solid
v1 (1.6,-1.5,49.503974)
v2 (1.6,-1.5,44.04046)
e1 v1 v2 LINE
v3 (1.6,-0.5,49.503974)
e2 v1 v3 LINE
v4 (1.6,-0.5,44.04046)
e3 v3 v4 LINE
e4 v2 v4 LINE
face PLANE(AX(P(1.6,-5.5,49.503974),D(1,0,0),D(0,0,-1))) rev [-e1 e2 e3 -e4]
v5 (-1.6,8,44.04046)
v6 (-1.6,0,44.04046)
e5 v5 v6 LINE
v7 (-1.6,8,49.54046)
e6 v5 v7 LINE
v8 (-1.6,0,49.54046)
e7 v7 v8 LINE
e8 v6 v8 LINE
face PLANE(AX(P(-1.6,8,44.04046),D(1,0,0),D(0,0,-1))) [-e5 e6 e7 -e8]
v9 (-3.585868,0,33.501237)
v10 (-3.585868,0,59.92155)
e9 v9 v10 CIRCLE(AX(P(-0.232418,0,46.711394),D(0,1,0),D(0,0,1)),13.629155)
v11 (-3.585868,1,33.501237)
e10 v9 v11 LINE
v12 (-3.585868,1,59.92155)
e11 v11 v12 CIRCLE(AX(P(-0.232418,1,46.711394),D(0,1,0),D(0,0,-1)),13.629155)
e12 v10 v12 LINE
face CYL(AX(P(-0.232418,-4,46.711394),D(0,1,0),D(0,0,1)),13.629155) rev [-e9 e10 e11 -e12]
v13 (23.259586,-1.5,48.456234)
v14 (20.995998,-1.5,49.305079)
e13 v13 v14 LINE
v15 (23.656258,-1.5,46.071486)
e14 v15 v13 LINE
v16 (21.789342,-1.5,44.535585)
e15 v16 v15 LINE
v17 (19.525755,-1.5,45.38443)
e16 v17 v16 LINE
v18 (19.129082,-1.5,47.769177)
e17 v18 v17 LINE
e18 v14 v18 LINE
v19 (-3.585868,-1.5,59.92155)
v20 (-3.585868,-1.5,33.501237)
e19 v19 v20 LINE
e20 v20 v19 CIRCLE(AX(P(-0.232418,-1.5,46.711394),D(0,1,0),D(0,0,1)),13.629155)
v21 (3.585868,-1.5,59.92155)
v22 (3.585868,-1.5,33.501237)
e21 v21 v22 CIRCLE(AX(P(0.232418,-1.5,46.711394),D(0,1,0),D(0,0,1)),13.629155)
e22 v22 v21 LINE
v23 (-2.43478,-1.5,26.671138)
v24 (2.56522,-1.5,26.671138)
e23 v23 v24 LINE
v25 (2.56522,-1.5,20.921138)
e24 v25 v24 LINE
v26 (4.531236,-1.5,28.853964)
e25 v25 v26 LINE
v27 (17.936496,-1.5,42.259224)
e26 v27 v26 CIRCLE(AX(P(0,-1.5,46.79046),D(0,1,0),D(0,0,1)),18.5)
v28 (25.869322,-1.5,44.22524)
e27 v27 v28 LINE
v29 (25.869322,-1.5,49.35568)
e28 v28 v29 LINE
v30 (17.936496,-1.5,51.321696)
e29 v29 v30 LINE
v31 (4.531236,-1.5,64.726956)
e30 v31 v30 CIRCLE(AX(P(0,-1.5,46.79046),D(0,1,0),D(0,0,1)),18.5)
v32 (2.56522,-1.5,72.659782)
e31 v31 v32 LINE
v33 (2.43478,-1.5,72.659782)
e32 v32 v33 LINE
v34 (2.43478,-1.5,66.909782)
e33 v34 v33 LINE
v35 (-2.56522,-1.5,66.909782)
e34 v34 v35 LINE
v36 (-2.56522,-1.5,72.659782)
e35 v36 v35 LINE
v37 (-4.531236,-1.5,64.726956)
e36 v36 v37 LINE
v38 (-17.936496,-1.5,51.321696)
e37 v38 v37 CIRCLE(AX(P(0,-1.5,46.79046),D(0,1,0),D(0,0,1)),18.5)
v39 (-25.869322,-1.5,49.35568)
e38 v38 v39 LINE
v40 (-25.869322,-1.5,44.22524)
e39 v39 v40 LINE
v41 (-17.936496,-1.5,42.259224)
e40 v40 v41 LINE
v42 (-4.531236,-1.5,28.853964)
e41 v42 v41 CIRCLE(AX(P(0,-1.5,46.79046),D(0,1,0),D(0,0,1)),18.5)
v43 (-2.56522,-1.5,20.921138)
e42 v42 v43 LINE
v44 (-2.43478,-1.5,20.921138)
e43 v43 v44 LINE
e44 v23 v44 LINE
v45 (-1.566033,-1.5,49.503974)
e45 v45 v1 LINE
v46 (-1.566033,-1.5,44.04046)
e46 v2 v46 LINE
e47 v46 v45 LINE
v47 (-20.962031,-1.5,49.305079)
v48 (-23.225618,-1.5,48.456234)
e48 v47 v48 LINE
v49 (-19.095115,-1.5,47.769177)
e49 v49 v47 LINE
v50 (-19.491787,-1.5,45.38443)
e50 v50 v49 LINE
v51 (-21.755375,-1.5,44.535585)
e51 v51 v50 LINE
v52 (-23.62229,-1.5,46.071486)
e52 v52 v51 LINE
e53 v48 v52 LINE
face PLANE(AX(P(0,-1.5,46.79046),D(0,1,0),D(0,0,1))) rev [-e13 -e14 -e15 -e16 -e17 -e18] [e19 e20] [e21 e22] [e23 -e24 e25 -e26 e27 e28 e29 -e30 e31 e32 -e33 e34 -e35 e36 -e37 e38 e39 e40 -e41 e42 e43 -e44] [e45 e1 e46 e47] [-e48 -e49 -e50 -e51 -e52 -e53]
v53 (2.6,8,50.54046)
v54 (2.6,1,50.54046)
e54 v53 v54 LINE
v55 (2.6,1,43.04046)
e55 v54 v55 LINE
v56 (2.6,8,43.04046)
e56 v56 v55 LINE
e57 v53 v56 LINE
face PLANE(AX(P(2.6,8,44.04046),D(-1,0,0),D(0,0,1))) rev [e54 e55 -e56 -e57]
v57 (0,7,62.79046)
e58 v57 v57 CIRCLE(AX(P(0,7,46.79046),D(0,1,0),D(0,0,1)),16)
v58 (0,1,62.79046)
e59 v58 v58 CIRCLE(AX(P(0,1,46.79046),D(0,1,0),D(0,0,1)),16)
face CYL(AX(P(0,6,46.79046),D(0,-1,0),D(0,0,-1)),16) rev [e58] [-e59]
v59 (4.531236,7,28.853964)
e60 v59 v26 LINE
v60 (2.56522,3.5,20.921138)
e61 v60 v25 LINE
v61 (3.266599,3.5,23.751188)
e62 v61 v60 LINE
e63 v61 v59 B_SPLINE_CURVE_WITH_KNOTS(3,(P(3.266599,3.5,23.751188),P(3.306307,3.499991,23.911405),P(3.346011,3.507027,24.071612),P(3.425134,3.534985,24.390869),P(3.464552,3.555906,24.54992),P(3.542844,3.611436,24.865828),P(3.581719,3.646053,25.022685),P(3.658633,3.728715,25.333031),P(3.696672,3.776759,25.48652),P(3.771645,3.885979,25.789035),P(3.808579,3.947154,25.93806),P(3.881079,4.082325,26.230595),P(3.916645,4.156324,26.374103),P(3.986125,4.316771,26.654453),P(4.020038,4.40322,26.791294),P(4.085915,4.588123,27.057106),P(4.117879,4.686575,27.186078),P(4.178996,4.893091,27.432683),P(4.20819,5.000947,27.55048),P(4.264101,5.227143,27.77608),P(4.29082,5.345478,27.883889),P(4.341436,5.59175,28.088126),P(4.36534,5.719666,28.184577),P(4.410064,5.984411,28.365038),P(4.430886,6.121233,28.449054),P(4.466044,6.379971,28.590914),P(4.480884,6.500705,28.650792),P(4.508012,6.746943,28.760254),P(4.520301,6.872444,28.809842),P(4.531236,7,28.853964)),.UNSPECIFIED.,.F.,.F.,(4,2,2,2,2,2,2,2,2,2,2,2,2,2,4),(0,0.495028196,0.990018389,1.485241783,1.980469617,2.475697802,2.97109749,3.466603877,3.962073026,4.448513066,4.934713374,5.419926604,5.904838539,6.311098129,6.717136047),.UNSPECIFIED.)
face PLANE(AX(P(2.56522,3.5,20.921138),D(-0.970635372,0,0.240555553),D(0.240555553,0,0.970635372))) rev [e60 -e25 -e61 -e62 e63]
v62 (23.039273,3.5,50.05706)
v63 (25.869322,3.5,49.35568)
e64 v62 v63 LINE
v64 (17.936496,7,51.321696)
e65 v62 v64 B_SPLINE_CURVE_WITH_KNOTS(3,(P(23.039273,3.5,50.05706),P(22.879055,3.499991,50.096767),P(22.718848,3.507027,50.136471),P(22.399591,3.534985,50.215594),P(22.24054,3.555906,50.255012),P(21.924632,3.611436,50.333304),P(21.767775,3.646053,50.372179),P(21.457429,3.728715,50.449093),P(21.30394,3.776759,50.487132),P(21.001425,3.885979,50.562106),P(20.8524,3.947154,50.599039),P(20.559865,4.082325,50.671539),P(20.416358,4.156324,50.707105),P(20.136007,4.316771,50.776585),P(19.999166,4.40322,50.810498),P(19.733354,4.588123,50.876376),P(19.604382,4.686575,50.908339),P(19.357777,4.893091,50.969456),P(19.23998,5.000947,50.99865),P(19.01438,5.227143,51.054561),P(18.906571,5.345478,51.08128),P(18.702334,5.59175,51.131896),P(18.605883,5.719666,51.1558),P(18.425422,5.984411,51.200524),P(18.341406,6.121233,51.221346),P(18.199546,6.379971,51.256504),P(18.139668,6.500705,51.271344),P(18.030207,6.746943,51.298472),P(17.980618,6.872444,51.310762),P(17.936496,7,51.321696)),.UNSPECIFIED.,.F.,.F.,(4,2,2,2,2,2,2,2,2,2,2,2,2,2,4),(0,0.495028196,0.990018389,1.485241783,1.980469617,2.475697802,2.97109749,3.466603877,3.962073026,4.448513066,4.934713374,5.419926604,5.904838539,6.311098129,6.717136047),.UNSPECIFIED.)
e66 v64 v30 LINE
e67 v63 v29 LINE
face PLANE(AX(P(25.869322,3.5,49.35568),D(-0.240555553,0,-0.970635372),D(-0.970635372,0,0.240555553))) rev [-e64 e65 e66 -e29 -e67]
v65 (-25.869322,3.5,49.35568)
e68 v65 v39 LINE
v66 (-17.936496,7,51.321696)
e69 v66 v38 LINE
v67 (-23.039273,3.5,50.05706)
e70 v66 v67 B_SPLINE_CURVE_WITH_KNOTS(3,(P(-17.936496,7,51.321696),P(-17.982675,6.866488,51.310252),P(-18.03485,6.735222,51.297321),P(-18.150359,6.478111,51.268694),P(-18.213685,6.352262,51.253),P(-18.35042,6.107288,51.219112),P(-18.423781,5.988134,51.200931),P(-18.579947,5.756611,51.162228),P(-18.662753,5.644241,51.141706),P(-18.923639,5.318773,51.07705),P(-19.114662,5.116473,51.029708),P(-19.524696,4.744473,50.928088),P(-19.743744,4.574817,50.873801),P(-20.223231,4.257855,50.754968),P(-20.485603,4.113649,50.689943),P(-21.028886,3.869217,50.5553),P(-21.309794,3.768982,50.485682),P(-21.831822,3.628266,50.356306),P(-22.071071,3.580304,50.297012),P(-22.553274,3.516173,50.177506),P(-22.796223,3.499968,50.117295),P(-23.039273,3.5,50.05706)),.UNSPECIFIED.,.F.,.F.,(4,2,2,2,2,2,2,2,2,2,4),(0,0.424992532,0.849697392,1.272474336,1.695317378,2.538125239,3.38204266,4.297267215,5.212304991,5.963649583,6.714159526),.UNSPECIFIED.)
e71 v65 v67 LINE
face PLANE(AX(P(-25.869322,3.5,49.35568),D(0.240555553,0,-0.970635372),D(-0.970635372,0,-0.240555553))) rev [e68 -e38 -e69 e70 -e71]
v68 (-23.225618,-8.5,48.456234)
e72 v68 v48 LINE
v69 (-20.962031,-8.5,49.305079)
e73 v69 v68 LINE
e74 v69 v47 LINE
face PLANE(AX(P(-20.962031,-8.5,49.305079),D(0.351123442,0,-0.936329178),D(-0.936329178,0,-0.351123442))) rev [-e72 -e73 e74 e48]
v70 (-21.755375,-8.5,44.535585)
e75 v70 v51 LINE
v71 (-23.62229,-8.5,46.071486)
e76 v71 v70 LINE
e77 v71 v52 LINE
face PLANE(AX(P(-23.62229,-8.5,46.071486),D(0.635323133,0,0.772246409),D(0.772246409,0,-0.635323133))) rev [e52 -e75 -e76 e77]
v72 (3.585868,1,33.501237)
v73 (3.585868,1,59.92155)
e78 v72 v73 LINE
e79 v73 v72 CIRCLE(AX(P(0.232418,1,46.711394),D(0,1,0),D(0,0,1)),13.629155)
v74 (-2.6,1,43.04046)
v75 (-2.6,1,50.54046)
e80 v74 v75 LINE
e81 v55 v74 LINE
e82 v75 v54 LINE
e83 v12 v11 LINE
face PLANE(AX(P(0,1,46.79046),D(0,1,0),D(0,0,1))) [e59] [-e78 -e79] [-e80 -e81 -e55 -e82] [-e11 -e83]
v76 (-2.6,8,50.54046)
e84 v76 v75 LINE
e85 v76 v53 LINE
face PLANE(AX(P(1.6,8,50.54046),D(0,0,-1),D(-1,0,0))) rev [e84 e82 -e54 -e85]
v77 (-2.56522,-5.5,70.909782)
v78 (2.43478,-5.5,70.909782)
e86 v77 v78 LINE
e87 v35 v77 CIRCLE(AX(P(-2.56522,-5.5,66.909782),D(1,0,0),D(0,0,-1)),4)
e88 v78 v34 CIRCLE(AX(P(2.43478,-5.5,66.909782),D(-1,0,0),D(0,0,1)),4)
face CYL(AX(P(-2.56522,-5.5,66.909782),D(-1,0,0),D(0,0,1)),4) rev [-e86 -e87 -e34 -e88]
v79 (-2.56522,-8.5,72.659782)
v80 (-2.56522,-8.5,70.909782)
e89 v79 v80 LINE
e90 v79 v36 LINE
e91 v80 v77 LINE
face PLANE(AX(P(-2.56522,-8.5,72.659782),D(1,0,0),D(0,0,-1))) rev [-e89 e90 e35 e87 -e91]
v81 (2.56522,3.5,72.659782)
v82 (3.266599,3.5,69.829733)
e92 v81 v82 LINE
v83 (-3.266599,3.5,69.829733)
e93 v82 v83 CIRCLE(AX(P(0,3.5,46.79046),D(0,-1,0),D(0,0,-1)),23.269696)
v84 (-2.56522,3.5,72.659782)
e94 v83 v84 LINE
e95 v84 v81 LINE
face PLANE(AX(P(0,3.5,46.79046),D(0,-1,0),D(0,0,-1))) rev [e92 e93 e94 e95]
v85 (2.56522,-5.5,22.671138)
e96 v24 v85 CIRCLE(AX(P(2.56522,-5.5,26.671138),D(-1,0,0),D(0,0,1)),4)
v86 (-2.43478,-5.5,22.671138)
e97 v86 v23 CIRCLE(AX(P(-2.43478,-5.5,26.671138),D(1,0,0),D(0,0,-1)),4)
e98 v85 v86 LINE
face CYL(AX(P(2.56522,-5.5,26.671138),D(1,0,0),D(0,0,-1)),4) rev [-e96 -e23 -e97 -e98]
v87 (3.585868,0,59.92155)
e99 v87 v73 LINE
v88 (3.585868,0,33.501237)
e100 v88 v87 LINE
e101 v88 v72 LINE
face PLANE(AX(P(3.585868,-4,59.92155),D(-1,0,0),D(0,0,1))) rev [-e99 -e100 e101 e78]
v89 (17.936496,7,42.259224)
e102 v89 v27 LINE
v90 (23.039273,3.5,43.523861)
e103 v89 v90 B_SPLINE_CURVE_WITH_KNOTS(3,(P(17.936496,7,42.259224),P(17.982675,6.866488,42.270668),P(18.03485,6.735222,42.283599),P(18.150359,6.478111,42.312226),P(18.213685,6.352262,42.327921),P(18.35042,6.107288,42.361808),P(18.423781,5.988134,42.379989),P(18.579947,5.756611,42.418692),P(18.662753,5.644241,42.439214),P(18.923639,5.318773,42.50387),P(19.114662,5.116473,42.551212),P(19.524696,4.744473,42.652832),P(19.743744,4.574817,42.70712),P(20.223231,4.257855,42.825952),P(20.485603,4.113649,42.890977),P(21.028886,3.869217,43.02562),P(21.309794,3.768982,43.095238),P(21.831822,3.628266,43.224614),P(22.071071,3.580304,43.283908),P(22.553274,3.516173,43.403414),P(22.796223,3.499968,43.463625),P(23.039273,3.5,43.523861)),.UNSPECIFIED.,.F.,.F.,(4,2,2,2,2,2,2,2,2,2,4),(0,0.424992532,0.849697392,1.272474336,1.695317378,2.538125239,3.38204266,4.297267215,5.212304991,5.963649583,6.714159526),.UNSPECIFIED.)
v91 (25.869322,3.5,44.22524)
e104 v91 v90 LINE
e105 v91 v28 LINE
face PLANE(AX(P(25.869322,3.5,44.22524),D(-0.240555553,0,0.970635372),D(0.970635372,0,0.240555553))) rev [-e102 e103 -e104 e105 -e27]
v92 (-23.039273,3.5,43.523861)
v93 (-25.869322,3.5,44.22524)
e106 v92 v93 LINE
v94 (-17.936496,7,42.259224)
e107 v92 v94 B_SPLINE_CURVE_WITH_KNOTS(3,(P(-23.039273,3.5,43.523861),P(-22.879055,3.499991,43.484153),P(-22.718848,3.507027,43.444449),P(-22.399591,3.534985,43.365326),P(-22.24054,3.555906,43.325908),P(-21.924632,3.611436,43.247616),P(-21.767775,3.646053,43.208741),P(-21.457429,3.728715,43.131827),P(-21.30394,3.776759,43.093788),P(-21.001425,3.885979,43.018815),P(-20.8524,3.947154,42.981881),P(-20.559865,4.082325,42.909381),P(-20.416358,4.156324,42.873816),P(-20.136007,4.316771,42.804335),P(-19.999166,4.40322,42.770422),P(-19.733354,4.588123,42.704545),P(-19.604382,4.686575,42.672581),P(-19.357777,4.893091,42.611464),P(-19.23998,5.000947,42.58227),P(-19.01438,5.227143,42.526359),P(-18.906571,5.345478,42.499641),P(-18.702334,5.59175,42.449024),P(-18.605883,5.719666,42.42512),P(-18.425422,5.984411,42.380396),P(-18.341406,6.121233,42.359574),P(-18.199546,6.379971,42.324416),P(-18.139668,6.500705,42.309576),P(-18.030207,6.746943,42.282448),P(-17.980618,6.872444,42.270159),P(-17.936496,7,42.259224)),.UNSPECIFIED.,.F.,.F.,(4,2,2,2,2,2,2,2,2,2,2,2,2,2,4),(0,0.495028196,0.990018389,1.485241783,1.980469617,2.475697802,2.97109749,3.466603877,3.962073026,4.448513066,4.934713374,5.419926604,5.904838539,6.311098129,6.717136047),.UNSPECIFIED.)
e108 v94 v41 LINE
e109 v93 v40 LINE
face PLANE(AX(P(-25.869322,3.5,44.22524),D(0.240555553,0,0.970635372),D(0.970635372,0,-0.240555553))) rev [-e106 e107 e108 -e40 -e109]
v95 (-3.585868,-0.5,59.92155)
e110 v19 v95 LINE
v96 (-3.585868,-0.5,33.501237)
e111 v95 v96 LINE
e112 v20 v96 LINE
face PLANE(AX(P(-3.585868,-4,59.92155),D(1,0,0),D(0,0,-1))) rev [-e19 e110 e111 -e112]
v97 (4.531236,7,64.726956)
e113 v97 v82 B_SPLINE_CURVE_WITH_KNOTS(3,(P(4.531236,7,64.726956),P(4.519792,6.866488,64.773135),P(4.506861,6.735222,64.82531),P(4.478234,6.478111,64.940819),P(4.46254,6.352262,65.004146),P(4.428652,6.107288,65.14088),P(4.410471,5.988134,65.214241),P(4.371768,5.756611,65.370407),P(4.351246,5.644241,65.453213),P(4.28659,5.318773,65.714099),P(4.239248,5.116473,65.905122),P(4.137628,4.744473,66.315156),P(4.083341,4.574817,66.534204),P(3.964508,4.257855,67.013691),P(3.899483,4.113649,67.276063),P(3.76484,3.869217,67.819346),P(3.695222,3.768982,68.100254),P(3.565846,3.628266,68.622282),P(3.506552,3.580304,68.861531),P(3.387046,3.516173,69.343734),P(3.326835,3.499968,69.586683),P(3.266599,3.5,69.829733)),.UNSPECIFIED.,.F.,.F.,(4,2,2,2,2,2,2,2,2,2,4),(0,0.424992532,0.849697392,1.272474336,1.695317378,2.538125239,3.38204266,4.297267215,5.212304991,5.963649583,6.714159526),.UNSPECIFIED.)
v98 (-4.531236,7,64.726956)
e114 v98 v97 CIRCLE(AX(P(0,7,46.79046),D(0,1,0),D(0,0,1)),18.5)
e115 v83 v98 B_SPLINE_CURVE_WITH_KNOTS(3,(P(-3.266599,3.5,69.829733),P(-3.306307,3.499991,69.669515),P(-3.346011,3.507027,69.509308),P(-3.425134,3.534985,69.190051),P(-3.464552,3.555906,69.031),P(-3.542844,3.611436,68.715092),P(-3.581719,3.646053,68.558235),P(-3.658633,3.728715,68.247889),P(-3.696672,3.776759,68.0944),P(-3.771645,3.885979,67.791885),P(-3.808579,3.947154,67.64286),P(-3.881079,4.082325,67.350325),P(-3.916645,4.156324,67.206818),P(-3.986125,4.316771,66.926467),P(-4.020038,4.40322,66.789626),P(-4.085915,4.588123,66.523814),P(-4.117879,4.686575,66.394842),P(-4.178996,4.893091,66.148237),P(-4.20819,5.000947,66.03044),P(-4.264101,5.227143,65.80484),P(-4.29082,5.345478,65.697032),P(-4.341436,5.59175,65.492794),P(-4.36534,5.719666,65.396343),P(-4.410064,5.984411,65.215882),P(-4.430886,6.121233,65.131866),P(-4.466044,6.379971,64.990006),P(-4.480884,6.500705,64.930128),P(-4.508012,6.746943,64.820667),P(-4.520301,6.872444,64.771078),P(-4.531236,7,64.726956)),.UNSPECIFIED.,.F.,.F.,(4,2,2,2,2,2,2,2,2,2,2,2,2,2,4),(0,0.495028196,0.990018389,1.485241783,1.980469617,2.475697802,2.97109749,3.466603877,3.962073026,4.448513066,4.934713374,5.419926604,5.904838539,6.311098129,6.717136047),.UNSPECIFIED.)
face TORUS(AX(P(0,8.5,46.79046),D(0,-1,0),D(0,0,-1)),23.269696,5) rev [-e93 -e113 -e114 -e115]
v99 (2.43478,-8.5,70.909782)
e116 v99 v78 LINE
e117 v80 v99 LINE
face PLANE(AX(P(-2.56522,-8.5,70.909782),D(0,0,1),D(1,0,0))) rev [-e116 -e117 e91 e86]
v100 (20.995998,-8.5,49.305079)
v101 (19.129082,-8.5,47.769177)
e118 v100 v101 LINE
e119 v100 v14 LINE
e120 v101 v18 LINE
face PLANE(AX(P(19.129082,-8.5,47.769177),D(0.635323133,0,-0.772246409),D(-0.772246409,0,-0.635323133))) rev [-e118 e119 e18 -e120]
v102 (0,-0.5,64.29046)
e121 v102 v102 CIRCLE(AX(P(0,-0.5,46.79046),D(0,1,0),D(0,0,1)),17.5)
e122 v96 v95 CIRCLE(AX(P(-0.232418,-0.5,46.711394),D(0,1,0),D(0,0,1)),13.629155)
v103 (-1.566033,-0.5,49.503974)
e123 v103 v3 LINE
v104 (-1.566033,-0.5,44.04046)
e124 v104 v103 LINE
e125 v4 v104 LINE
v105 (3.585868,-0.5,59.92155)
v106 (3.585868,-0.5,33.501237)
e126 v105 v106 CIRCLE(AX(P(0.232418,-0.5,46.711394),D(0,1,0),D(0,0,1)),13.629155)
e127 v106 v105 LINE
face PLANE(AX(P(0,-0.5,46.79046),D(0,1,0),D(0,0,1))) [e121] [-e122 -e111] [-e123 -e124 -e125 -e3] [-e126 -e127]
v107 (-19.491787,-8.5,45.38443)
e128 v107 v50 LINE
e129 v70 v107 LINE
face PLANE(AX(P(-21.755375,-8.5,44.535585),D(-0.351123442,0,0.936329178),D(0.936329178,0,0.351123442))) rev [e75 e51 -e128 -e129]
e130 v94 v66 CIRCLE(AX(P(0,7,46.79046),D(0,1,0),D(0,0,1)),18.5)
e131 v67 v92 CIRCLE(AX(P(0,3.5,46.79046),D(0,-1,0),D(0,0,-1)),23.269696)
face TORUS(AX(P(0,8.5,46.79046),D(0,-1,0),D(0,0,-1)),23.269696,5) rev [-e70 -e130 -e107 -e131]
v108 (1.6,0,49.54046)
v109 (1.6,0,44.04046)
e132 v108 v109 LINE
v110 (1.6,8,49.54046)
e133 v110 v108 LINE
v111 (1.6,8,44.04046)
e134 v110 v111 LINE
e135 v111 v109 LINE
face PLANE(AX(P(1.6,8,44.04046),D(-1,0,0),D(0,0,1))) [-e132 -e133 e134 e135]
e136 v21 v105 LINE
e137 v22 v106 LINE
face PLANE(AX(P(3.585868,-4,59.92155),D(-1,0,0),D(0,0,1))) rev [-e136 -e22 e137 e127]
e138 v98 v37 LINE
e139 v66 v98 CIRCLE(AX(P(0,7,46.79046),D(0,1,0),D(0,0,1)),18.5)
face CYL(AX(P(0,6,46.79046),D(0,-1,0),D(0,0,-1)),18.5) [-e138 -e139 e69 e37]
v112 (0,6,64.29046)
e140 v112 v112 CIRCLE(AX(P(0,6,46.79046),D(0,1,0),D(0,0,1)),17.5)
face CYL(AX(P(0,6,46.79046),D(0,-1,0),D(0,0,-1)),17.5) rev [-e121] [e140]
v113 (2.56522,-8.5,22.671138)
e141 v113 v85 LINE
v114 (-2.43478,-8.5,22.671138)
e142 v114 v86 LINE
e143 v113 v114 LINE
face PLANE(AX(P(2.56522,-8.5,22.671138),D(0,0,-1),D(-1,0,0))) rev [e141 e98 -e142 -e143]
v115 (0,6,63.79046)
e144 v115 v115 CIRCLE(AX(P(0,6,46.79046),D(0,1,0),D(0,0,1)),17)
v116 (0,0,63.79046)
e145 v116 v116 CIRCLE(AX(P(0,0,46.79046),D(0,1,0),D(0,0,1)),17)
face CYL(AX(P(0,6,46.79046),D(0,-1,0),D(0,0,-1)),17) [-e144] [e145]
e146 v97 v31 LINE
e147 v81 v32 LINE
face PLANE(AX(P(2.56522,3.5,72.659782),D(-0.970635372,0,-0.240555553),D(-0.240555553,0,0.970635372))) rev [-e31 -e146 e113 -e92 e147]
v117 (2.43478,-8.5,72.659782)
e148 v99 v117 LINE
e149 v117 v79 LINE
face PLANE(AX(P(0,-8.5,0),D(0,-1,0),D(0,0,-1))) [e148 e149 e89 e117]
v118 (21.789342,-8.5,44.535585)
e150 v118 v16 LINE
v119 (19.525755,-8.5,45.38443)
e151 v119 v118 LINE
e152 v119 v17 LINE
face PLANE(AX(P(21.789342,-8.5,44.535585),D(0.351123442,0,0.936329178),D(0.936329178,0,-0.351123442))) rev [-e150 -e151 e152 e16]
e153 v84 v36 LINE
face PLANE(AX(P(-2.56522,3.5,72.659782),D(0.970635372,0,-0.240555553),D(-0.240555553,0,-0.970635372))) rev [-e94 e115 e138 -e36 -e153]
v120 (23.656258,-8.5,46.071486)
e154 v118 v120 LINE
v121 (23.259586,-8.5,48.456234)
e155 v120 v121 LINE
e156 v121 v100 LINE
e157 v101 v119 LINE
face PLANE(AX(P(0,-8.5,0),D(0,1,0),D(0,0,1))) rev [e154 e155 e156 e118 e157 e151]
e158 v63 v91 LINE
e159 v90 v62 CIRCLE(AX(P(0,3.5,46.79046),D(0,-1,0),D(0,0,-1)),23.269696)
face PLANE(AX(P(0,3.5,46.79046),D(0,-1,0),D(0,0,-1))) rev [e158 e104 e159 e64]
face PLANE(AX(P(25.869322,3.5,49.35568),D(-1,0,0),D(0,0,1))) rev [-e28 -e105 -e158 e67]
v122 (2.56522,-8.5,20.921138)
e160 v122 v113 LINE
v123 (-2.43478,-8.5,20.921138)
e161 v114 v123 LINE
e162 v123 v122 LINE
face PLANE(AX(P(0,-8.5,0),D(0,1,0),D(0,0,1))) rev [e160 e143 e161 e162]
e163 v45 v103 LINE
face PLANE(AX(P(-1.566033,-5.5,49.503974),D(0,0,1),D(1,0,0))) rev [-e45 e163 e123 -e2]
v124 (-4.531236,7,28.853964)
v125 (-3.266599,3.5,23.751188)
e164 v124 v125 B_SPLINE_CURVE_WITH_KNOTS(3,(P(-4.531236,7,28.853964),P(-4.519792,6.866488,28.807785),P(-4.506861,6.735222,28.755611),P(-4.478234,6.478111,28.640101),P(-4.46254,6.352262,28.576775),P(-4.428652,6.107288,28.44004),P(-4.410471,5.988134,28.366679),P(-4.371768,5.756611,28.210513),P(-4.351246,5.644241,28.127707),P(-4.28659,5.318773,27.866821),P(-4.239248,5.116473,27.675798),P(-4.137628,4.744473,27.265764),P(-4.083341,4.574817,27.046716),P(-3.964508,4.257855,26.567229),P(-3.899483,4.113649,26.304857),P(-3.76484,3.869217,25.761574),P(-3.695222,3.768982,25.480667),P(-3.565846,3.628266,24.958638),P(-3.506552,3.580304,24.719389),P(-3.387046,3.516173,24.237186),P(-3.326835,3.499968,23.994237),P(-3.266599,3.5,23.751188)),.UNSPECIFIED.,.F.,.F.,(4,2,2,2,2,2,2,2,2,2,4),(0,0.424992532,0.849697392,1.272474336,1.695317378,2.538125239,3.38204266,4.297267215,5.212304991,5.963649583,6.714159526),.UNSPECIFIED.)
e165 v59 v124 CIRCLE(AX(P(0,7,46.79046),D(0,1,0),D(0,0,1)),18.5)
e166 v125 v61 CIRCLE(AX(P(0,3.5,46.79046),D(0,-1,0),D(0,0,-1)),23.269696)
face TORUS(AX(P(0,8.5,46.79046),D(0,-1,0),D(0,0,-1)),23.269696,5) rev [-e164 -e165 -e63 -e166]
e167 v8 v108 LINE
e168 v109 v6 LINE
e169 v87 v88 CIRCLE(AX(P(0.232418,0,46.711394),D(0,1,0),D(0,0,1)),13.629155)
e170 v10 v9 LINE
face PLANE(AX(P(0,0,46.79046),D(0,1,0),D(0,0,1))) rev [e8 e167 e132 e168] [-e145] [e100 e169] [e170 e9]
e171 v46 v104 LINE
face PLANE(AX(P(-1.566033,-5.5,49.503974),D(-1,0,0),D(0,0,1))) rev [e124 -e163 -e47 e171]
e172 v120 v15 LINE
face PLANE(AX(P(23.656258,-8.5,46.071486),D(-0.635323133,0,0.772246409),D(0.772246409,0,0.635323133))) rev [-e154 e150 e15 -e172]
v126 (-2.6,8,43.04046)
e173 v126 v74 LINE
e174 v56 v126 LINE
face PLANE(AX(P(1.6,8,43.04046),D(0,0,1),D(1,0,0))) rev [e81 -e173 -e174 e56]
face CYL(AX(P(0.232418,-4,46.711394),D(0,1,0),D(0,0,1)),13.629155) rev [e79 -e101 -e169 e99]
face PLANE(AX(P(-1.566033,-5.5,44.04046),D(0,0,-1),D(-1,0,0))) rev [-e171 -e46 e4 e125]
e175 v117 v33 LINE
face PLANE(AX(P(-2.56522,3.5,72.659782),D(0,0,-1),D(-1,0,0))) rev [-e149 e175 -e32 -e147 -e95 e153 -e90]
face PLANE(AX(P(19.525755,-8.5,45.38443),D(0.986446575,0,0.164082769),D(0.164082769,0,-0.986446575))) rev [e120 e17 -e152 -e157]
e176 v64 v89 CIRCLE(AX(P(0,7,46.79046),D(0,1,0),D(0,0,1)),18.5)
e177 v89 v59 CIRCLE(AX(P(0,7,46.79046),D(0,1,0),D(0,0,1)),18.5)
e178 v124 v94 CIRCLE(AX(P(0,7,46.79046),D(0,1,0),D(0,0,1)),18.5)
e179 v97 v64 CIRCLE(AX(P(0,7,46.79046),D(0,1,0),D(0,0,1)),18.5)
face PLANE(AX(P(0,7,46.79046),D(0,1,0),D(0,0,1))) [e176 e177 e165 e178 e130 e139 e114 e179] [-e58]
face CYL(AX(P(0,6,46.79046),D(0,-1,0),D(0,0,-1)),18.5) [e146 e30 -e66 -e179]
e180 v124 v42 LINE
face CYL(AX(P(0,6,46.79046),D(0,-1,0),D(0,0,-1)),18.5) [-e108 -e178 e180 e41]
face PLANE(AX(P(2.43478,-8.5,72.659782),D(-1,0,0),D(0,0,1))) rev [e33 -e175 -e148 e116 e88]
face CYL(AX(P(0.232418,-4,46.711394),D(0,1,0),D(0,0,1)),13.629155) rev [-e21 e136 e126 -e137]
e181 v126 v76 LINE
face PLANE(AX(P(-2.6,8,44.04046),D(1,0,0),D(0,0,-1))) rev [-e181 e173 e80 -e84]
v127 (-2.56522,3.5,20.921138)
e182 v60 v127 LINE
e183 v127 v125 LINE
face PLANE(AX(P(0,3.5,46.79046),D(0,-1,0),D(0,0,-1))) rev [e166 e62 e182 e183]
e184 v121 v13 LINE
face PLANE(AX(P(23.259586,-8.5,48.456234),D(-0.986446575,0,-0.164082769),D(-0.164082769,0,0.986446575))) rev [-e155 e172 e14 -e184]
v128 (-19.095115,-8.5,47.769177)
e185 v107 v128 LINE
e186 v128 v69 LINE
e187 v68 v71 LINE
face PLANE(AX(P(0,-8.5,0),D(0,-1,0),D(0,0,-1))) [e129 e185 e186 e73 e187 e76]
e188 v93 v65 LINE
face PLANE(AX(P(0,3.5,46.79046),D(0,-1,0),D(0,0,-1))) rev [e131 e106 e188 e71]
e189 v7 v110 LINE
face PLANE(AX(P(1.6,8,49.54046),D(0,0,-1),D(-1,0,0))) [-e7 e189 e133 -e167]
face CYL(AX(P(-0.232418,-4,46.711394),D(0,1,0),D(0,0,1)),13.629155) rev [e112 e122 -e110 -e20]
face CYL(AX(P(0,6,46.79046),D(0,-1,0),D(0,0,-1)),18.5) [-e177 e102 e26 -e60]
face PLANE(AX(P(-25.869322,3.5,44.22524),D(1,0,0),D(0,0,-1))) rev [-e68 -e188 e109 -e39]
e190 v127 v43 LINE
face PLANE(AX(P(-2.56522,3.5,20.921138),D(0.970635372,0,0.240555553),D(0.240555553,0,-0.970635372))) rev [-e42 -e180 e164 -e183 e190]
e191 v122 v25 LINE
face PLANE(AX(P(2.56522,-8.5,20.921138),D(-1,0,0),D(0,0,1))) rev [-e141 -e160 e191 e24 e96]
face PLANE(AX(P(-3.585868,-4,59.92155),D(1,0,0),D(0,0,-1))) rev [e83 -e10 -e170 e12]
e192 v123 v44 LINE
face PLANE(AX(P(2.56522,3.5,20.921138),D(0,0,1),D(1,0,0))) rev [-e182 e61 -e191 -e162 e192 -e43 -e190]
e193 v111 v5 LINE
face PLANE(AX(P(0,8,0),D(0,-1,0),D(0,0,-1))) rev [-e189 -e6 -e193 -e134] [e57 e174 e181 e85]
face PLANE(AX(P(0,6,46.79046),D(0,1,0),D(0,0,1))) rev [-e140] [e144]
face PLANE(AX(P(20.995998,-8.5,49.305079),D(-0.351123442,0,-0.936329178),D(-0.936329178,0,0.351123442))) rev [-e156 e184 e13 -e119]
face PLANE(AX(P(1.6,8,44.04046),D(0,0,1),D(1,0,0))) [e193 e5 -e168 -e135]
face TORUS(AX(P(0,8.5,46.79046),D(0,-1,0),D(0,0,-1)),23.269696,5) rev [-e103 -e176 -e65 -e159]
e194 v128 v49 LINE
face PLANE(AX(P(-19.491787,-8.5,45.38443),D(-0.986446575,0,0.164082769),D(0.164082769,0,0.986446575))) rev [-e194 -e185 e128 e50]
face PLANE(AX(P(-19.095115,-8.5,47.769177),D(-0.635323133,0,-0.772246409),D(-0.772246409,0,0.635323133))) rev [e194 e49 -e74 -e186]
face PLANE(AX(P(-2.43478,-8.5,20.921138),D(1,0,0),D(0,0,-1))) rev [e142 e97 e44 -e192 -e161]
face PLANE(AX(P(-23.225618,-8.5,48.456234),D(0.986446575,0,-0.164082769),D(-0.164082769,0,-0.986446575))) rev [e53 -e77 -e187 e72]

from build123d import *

# Parameters (mm, degrees)
SKETCH4_R                = 17
BOSS_EXTRUDE3_DEPTH      = 6
SHELL4_T                 = 0.5
SKETCH5_W                = 3.2
SKETCH5_H                = 5.5
BOSS_EXTRUDE4_DEPTH      = 8
SHELL5_T                 = 1
BOSS_EXTRUDE6_DEPTH      = 3.5
BOSS_EXTRUDE6_DEPTH_BACK = 1.5
SKETCH7_W                = 5
SKETCH7_H                = 1.75
BOSS_EXTRUDE7_DEPTH      = 7
FILLET3_R                = 5
CUT_EXTRUDE1_DEPTH       = 5
SKETCH13_W               = 3.166032567
SKETCH13_H               = 5.463514234
CUT_EXTRUDE2_DEPTH       = 5
FILLET4_R                = 4
BOSS_EXTRUDE8_DEPTH      = 7


with BuildPart() as part:
    # Sketch4 → Boss-Extrude3 (new body)
    with BuildSketch(Plane(origin=(0, 0, 0), x_dir=(1, 0, 0), z_dir=(0, 1, 0))):
        with Locations(Location((0, -46.79046007, 0), (0, 0, 270))):
            Circle(SKETCH4_R)
    extrude(amount=BOSS_EXTRUDE3_DEPTH)

    # Shell4
    shell4_openings = [part.faces().sort_by_distance(p)[0] for p in [
        (0, 6, 46.79046007),
    ]]
    offset(amount=SHELL4_T, openings=shell4_openings, kind=Kind.INTERSECTION)

    # Sketch5 → Boss-Extrude4 (add)
    with BuildSketch(Plane(origin=(0, 0, 0), x_dir=(1, 0, 0), z_dir=(0, 1, 0))):
        with Locations((0, -46.79046007)):
            Rectangle(SKETCH5_W, SKETCH5_H)
    extrude(amount=BOSS_EXTRUDE4_DEPTH)

    # Shell5
    shell5_openings = [part.faces().sort_by_distance(p)[0] for p in [
        (0, 8, 46.79046007),
    ]]
    offset(amount=SHELL5_T, openings=shell5_openings, kind=Kind.INTERSECTION)

    # Sketch6 → Boss-Extrude6 (add, two sides: drawn at the far end of the back side and taken through both)
    with BuildSketch(Plane(origin=(0, 0, 0), x_dir=(1, 0, 0), z_dir=(0, 1, 0)).offset(-BOSS_EXTRUDE6_DEPTH_BACK)):
        with BuildLine():
            Line((-2.565219646, -72.659781842), (2.565219646, -72.659781842))
            Line((2.565219646, -72.659781842), (4.531236217, -64.726956337))
            ThreePointArc((4.531236217, -64.726956337), (0, -65.29046007), (-4.531236217, -64.726956337))
            Line((-4.531236217, -64.726956337), (-2.565219646, -72.659781842))
        make_face()
        with BuildLine():
            Line((-25.869321772, -44.225240424), (-17.936496267, -42.259223853))
            ThreePointArc((-17.936496267, -42.259223853), (-18.5, -46.79046007), (-17.936496267, -51.321696288))
            Line((-17.936496267, -51.321696288), (-25.869321772, -49.355679717))
            Line((-25.869321772, -49.355679717), (-25.869321772, -44.225240424))
        make_face()
        with BuildLine():
            Line((2.565219646, -20.921138298), (4.531236217, -28.853963803))
            ThreePointArc((4.531236217, -28.853963803), (0, -28.29046007), (-4.531236217, -28.853963803))
            Line((-4.531236217, -28.853963803), (-2.565219646, -20.921138298))
            Line((-2.565219646, -20.921138298), (2.565219646, -20.921138298))
        make_face()
        with BuildLine():
            Line((25.869321772, -49.355679717), (17.936496267, -51.321696288))
            ThreePointArc((17.936496267, -51.321696288), (18.5, -46.79046007), (17.936496267, -42.259223853))
            Line((17.936496267, -42.259223853), (25.869321772, -44.225240424))
            Line((25.869321772, -44.225240424), (25.869321772, -49.355679717))
        make_face()
    extrude(amount=BOSS_EXTRUDE6_DEPTH + BOSS_EXTRUDE6_DEPTH_BACK)

    # Sketch7 → Boss-Extrude7 (add)
    with BuildSketch(Plane(origin=(0, -1.5, 0), x_dir=(-1, 0, 0), z_dir=(0, -1, 0))):
        with Locations((0.065219646, -71.784781842)):
            Rectangle(SKETCH7_W, SKETCH7_H)
        with Locations((-0.065219646, -21.796138298)):
            Rectangle(SKETCH7_W, SKETCH7_H)
    extrude(amount=BOSS_EXTRUDE7_DEPTH)

    # Fillet3
    # the kernel refuses this fillet: 5 mm, written as the material it adds along each edge
    with BuildSketch(Plane(origin=(0, 3.5, 46.79046007), x_dir=(-0.6278344871312538, 0, -0.7783468743231616), z_dir=(0.7783468743231616, 0, -0.6278344871312538))) as fillet3_piece_1_section:
        with BuildLine():
            CenterArc((23.269696007, 5), FILLET3_R, 197.457603124, 72.542396876)
            Line((23.269696007, 0), (23.269696007, -0.1))
            Line((23.269696007, -0.1), (18.5, -0.1))
            Line((18.5, -0.1), (18.4, 0))
            ThreePointArc((18.4, 0), (18.4, 1.75), (18.40460608, 3.47))
            Line((18.40460608, 3.47), (18.5, 3.5))
        make_face()
    fillet3_piece_1 = revolve(axis=Axis((0, 3.5, 46.79046007), (0, 1, 0)), revolution_arc=102.218929963, mode=Mode.PRIVATE)
    fillet3_piece_1 = split(fillet3_piece_1, bisect_by=Plane(origin=(-20.380505818, 4.426759582, 42.864930265), z_dir=(0.24055555302697984, 0, 0.9706353722731745)), keep=Keep.TOP, mode=Mode.PRIVATE)
    fillet3_piece_1 = split(fillet3_piece_1, bisect_by=Plane(origin=(-20.380505744, 4.426759582, 50.715989893), z_dir=(0.24055555302697348, 0, -0.9706353722731761)), keep=Keep.TOP, mode=Mode.PRIVATE)
    add(fillet3_piece_1)
    with BuildSketch(Plane(origin=(0, 3.5, 46.79046007), x_dir=(0.7783347748418207, 0, 0.6278494869568123), z_dir=(0.6278494869568123, 0, -0.7783347748418207))) as fillet3_piece_2_section:
        with BuildLine():
            CenterArc((23.269696007, -5), FILLET3_R, 90, 72.542396876)
            Line((23.269696007, 0), (23.269696007, 0.1))
            Line((23.269696007, 0.1), (18.5, 0.1))
            Line((18.5, 0.1), (18.4, 0))
            ThreePointArc((18.4, 0), (18.4, -1.75), (18.40460608, -3.47))
            Line((18.40460608, -3.47), (18.5, -3.5))
        make_face()
    fillet3_piece_2 = revolve(axis=Axis((0, 3.5, 46.79046007), (0, -1, 0)), revolution_arc=51.108360804, mode=Mode.PRIVATE)
    fillet3_piece_2 = split(fillet3_piece_2, bisect_by=Plane(origin=(4.048850537, 4.426759722, 66.673369956), z_dir=(-0.970635372273176, 0, -0.24055555302697343)), keep=Keep.TOP, mode=Mode.PRIVATE)
    add(fillet3_piece_2)
    with BuildSketch(Plane(origin=(0, 3.5, 46.79046007), x_dir=(0.7783468743230912, 0, -0.6278344871313409), z_dir=(0.6278344871313409, 0, 0.7783468743230912))) as fillet3_piece_3_section:
        with BuildLine():
            CenterArc((23.269696007, 5), FILLET3_R, 197.457603124, 72.542396876)
            Line((23.269696007, 0), (23.269696007, -0.1))
            Line((23.269696007, -0.1), (18.5, -0.1))
            Line((18.5, -0.1), (18.4, 0))
            ThreePointArc((18.4, 0), (18.4, 1.75), (18.40460608, 3.47))
            Line((18.40460608, 3.47), (18.5, 3.5))
        make_face()
    fillet3_piece_3 = revolve(axis=Axis((0, 3.5, 46.79046007), (0, 1, 0)), revolution_arc=102.218929963, mode=Mode.PRIVATE)
    fillet3_piece_3 = split(fillet3_piece_3, bisect_by=Plane(origin=(3.925529805, 4.426759582, 26.409954252), z_dir=(-0.9706353722731743, 0, 0.24055555302698087)), keep=Keep.TOP, mode=Mode.PRIVATE)
    fillet3_piece_3 = split(fillet3_piece_3, bisect_by=Plane(origin=(-3.925529823, 4.426759582, 26.409954326), z_dir=(0.9706353722731764, 0, 0.2405555530269717)), keep=Keep.TOP, mode=Mode.PRIVATE)
    add(fillet3_piece_3)
    with BuildSketch(Plane(origin=(0, 3.5, 46.79046007), x_dir=(0.6278344871312218, 0, 0.7783468743231875), z_dir=(-0.7783468743231875, 0, 0.6278344871312218))) as fillet3_piece_4_section:
        with BuildLine():
            CenterArc((23.269696007, 5), FILLET3_R, 197.457603124, 72.542396876)
            Line((23.269696007, 0), (23.269696007, -0.1))
            Line((23.269696007, -0.1), (18.5, -0.1))
            Line((18.5, -0.1), (18.4, 0))
            ThreePointArc((18.4, 0), (18.4, 1.75), (18.40460608, 3.47))
            Line((18.40460608, 3.47), (18.5, 3.5))
        make_face()
    fillet3_piece_4 = revolve(axis=Axis((0, 3.5, 46.79046007), (0, 1, 0)), revolution_arc=102.218929963, mode=Mode.PRIVATE)
    fillet3_piece_4 = split(fillet3_piece_4, bisect_by=Plane(origin=(20.380505818, 4.426759582, 50.715989875), z_dir=(-0.24055555302698112, 0, -0.9706353722731741)), keep=Keep.TOP, mode=Mode.PRIVATE)
    fillet3_piece_4 = split(fillet3_piece_4, bisect_by=Plane(origin=(20.380505744, 4.426759582, 42.864930247), z_dir=(-0.24055555302697304, 0, 0.9706353722731761)), keep=Keep.TOP, mode=Mode.PRIVATE)
    add(fillet3_piece_4)
    with BuildSketch(Plane(origin=(0, 3.5, 46.79046007), x_dir=(0, 0, 1), z_dir=(1, 0, 0))) as fillet3_piece_5_section:
        with BuildLine():
            CenterArc((23.269696007, -5), FILLET3_R, 90, 72.542396876)
            Line((23.269696007, 0), (23.269696007, 0.1))
            Line((23.269696007, 0.1), (18.5, 0.1))
            Line((18.5, 0.1), (18.4, 0))
            ThreePointArc((18.4, 0), (18.4, -1.75), (18.40460608, -3.47))
            Line((18.40460608, -3.47), (18.5, -3.5))
        make_face()
    fillet3_piece_5 = revolve(axis=Axis((0, 3.5, 46.79046007), (0, -1, 0)), revolution_arc=51.108360804, mode=Mode.PRIVATE)
    fillet3_piece_5 = split(fillet3_piece_5, bisect_by=Plane(origin=(-4.04885046, 4.426759578, 66.673370268), z_dir=(0.9706353722731745, 0, -0.24055555302697917)), keep=Keep.TOP, mode=Mode.PRIVATE)
    add(fillet3_piece_5)

    # Sketch11 → Cut-Extrude1 (cut)
    with BuildSketch(Plane(origin=(0, 1, 0), x_dir=(1, 0, 0), z_dir=(0, 1, 0))):
        with BuildLine():
            Line((-3.585868376, -59.921550203), (-3.585868376, -33.501237191))
            ThreePointArc((-3.585868376, -33.501237191), (-13.861572731, -46.711393697), (-3.585868376, -59.921550203))
        make_face()
        with BuildLine():
            Line((3.585868376, -59.921550203), (3.585868376, -33.501237191))
            ThreePointArc((3.585868376, -33.501237191), (13.861572731, -46.711393697), (3.585868376, -59.921550203))
        make_face()
    extrude(amount=-CUT_EXTRUDE1_DEPTH, mode=Mode.SUBTRACT)

    # Sketch13 → Cut-Extrude2 (cut)
    with BuildSketch(Plane(origin=(0, -0.5, 0), x_dir=(1, 0, 0), z_dir=(0, 1, 0))):
        with Locations((0.016983716, -46.772217187)):
            Rectangle(SKETCH13_W, SKETCH13_H)
    extrude(amount=-CUT_EXTRUDE2_DEPTH, mode=Mode.SUBTRACT)

    # Fillet4
    fillet4_edges = [part.edges().sort_by_distance(p)[0] for p in [
        (0.065219646, -1.5, 22.671138298),
        (-0.065219646, -1.5, 70.909781842),
    ]]
    fillet(fillet4_edges, radius=FILLET4_R)

    # Sketch16 → Boss-Extrude8 (add)
    with BuildSketch(Plane(origin=(0, -1.5, 0), x_dir=(-1, 0, 0), z_dir=(0, -1, 0))):
        Polygon((19.095115037, -47.769177252), (20.96203058, -49.305079029), (23.225618307, -48.456233631), (23.622290493, -46.071486456), (21.75537495, -44.535584679), (19.491787223, -45.384430077), align=None)
        Polygon((-19.525754656, -45.384430077), (-19.12908247, -47.769177252), (-20.995998013, -49.305079029), (-23.25958574, -48.456233631), (-23.656257926, -46.071486456), (-21.789342383, -44.535584679), align=None)
    extrude(amount=BOSS_EXTRUDE8_DEPTH)


solid = part.part
